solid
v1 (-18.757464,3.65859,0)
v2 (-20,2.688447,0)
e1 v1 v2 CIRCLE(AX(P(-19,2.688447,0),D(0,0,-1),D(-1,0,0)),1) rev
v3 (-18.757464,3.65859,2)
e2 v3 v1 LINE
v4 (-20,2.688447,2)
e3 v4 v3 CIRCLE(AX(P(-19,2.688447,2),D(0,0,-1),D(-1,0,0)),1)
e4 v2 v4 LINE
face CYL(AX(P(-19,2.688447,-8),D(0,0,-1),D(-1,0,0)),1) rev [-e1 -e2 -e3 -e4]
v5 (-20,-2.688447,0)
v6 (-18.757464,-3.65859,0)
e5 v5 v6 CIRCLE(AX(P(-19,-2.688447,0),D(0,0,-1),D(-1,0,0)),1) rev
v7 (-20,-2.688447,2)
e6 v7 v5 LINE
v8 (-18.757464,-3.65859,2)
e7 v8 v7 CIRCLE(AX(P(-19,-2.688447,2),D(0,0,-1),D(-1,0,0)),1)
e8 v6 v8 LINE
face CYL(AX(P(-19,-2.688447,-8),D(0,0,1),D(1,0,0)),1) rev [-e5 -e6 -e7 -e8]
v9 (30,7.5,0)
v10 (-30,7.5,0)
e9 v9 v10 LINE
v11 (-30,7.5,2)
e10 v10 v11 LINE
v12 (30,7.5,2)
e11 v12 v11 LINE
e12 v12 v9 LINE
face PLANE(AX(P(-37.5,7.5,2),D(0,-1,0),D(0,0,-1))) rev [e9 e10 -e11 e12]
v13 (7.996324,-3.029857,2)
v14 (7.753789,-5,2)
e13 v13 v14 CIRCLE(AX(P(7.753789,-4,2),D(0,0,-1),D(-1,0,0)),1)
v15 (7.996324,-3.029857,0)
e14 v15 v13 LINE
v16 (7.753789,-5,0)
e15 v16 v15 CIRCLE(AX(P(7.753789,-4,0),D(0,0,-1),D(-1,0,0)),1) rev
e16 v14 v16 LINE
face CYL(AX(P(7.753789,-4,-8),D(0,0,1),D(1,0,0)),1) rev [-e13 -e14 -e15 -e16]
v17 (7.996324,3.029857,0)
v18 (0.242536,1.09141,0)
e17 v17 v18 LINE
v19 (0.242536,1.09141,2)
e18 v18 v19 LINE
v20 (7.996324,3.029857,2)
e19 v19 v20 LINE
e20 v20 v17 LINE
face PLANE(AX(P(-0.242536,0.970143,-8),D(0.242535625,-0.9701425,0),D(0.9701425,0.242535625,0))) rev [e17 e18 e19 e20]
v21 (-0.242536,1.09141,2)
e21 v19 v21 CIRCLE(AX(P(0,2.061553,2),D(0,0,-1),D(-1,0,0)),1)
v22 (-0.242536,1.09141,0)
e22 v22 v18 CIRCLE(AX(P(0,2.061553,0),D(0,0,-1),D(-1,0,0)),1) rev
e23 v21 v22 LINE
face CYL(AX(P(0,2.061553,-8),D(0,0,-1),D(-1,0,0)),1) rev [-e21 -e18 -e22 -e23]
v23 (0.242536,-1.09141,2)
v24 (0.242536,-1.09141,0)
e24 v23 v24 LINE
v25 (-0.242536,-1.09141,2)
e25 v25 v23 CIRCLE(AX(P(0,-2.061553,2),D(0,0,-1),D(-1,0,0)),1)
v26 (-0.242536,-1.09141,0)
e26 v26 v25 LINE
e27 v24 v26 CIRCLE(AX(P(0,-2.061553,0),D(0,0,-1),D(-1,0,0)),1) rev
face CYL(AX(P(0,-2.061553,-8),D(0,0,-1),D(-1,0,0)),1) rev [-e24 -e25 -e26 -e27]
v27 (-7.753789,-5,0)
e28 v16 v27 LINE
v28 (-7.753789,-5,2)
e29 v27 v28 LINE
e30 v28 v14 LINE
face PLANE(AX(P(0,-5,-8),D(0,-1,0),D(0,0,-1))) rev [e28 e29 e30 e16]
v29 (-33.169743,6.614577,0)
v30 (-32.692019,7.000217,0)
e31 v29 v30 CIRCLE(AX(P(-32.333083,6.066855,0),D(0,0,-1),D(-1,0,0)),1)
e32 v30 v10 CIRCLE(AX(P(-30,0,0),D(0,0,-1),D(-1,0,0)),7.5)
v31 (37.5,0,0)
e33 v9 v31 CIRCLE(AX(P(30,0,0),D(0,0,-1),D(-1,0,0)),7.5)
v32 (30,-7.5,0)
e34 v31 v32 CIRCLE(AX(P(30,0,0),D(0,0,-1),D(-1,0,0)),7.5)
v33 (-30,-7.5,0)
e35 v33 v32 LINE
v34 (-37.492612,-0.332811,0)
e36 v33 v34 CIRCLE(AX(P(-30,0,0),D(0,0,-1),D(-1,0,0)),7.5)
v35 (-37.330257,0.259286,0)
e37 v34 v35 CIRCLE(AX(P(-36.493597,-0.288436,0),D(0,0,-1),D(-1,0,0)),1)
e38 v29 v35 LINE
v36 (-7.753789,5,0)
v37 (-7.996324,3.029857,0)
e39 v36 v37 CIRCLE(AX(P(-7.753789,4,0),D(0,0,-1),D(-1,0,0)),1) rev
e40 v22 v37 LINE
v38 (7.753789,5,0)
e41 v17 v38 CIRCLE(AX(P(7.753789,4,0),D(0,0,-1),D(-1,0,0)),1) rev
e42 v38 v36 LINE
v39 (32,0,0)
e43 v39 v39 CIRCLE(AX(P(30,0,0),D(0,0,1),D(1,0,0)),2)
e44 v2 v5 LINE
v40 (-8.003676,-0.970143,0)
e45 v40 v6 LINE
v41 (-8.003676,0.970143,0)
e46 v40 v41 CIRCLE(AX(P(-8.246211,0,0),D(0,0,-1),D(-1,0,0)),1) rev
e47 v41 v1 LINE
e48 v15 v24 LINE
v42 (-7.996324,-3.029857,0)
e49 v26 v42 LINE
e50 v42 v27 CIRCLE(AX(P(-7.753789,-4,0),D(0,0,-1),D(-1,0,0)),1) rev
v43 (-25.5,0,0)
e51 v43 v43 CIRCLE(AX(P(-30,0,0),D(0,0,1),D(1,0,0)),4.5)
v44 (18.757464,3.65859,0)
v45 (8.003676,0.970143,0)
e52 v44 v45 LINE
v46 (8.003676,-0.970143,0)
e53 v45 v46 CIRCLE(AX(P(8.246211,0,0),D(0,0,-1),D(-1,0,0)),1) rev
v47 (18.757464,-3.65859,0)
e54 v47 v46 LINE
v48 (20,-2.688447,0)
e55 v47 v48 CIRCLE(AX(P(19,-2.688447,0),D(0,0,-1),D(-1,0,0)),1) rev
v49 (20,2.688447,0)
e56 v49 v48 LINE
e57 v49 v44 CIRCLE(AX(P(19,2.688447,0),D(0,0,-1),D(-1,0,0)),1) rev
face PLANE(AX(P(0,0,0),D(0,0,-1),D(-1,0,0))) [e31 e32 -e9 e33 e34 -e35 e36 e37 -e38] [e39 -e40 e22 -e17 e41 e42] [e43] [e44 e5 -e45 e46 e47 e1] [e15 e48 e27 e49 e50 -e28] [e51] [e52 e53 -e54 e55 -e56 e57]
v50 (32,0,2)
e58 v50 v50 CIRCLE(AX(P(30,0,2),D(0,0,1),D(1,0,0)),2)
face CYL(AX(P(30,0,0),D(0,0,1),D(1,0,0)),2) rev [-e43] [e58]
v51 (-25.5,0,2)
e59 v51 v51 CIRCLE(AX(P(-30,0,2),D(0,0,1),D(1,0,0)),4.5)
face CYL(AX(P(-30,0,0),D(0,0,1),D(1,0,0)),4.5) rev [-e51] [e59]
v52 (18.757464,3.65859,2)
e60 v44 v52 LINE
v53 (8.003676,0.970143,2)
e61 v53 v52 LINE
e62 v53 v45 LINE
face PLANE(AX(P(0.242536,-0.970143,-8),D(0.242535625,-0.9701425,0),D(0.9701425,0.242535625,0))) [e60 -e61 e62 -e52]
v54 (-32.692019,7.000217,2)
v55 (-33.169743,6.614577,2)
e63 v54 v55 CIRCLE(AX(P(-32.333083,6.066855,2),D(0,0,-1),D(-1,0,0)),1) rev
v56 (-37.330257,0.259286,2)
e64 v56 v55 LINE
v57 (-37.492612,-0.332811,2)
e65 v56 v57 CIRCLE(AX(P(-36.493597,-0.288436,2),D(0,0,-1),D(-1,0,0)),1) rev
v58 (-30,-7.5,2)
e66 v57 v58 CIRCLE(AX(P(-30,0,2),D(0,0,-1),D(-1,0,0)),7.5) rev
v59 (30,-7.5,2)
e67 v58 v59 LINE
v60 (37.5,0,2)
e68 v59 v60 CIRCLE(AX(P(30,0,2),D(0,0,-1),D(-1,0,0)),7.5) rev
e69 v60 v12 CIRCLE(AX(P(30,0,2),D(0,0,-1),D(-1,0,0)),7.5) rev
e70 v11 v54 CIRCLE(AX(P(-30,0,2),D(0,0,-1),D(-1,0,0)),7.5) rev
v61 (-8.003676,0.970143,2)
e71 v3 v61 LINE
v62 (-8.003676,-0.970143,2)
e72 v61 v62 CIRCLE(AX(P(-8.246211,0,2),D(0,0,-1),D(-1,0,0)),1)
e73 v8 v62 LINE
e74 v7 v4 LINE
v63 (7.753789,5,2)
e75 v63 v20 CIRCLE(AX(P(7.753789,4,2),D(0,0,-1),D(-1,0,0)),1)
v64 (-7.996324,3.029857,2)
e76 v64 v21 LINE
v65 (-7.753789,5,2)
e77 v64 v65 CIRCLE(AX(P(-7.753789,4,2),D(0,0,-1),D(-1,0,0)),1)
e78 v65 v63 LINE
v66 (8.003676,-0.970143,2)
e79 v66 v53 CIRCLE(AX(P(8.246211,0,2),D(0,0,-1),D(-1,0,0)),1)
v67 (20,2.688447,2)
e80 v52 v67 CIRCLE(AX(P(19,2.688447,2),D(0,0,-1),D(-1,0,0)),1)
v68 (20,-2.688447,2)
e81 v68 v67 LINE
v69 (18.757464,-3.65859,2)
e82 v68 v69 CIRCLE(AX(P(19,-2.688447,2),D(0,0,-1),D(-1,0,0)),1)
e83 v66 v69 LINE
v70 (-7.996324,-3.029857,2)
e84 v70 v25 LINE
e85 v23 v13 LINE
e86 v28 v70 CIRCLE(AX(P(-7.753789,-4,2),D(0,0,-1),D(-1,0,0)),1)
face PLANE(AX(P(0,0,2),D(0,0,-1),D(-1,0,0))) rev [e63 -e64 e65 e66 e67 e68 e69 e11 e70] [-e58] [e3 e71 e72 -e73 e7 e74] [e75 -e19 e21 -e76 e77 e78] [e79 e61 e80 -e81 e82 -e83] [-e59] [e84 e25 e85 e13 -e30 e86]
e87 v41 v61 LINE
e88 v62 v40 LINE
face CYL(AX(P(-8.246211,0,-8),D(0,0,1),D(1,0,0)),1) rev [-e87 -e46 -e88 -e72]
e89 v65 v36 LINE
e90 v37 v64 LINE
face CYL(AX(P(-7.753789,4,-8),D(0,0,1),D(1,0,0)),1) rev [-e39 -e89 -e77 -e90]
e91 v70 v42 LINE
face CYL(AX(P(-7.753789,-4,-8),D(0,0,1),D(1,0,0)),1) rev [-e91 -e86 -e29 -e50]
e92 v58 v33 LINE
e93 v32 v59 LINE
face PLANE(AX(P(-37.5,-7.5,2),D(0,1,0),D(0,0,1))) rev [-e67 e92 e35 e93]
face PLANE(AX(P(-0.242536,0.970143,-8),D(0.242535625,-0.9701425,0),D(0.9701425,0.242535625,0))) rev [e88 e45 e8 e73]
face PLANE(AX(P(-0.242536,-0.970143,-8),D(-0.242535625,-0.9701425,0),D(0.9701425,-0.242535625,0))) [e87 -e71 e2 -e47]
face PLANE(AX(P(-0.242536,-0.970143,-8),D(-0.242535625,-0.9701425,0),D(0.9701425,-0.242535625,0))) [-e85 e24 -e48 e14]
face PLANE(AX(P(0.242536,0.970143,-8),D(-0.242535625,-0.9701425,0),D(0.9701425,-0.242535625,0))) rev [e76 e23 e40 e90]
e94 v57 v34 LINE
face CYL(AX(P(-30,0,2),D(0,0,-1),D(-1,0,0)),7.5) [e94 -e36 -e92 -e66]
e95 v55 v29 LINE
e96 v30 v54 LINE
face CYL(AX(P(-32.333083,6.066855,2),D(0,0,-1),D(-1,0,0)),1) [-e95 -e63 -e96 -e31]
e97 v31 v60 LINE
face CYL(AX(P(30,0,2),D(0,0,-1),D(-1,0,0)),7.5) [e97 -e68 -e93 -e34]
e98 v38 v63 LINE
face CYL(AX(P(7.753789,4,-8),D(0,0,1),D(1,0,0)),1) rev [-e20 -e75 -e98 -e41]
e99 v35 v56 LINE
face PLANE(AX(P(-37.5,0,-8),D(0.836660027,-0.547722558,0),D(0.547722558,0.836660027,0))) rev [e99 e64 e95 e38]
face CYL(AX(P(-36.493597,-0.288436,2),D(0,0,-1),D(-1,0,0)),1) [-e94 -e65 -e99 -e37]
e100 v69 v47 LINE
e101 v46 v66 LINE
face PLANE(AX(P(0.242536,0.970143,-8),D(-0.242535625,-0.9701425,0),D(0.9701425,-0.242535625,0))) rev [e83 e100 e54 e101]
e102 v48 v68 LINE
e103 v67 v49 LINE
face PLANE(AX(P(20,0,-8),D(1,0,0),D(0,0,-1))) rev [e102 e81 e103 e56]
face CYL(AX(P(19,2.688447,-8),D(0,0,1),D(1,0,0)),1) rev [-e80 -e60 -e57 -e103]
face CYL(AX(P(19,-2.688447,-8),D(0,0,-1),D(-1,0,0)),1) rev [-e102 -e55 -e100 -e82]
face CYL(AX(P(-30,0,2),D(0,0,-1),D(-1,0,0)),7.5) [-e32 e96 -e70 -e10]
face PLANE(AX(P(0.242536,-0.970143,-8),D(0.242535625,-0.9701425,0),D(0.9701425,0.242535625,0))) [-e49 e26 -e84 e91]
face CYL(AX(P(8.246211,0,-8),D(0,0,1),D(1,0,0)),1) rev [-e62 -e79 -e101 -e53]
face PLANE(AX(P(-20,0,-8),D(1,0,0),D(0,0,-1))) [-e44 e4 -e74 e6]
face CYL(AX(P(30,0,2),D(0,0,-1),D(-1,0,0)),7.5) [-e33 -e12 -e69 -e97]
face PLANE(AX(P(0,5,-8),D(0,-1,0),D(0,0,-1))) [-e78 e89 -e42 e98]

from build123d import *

# Parameters (mm, degrees)
SKETCH_1_W              = 75
SKETCH_1_H              = 15
EXTRUDE_1_DEPTH         = 2
FILLET_1_R              = 7.5
SKETCH_2_R              = 2
SKETCH_2_R_2            = 4.5
CUT_EXTRUDE_1_DEPTH     = 2
CUT_EXTRUDE_2_DEPTH     = 10
FILLET_2_R              = 1
CUT_EXTRUDE_START       = -34
CUT_EXTRUDE_3_OUTLINE_W = 11
CUT_EXTRUDE_3_OUTLINE_H = 4
CUT_EXTRUDE_3_DEPTH     = 2.625249005
FILLET_3_R              = 1


with BuildPart() as part:
    # 草图1 → 凸台-拉伸1 (new body)
    with BuildSketch(Plane.XY):
        Rectangle(SKETCH_1_W, SKETCH_1_H)
    extrude(amount=EXTRUDE_1_DEPTH)

    # 圆角1
    fillet_1_edges = [part.edges().sort_by_distance(p)[0] for p in [
        (37.5, -7.5, 1),
        (-37.5, -7.5, 1),
        (-37.5, 7.5, 1),
        (37.5, 7.5, 1),
    ]]
    fillet(fillet_1_edges, radius=FILLET_1_R - 0.0001)  # a hair under: the kernel refuses the full size

    # 草图2 → 切除-拉伸1 (cut)
    with BuildSketch(Plane.XY.offset(2)):
        with Locations((30, 0)):
            Circle(SKETCH_2_R)
        with Locations((-30, 0)):
            Circle(SKETCH_2_R_2)
    extrude(amount=-CUT_EXTRUDE_1_DEPTH, mode=Mode.SUBTRACT)

    # 草图3 → 切除-拉伸2 (cut)
    with BuildSketch(Plane.XY.offset(2)):
        Polygon((-20, -3.969223594), (-20, 3.969223594), (-4.123105626, 0), align=None)
        Polygon((-15.876894374, 5), (0, 1.030776406), (15.876894374, 5), align=None)
        Polygon((0, -1.030776406), (-15.876894374, -5), (15.876894374, -5), align=None)
        Polygon((4.123105626, 0), (20, -3.969223594), (20, 3.969223594), align=None)
    extrude(amount=-CUT_EXTRUDE_2_DEPTH, mode=Mode.SUBTRACT)

    # 圆角2
    fillet_2_edges = [part.edges().sort_by_distance(p)[0] for p in [
        (-20, -3.969223594, 1),
        (-20, 3.969223594, 1),
        (-4.123105626, 0, 1),
        (0, -1.030776406, 1),
        (15.876894374, -5, 1),
        (-15.876894374, -5, 1),
        (4.123105626, 0, 1),
        (20, 3.969223594, 1),
        (20, -3.969223594, 1),
        (0, 1.030776406, 1),
        (-15.876894374, 5, 1),
        (15.876894374, 5, 1),
    ]]
    fillet(fillet_2_edges, radius=FILLET_2_R)

    # 切除-拉伸3: read off the stored shape, not the designer's step
    # 切除-拉伸3 outline → 切除-拉伸3 (cut)
    with BuildSketch(Plane(origin=(0, 0, 0), x_dir=(0.5477225575051656, 0.8366600265340758, 0), z_dir=(0.8366600265340758, -0.5477225575051659, 0)).offset(CUT_EXTRUDE_START)):
        with Locations((-16.5, 1)):
            Rectangle(CUT_EXTRUDE_3_OUTLINE_W, CUT_EXTRUDE_3_OUTLINE_H)
    extrude(amount=CUT_EXTRUDE_3_DEPTH, mode=Mode.SUBTRACT)

    # 圆角3
    fillet_3_edges = [part.edges().sort_by_distance(p)[0] for p in [
        (-32.999968349, 6.87391189, 1),
        (-37.5, 0, 1),
    ]]
    fillet(fillet_3_edges, radius=FILLET_3_R)


solid = part.part
